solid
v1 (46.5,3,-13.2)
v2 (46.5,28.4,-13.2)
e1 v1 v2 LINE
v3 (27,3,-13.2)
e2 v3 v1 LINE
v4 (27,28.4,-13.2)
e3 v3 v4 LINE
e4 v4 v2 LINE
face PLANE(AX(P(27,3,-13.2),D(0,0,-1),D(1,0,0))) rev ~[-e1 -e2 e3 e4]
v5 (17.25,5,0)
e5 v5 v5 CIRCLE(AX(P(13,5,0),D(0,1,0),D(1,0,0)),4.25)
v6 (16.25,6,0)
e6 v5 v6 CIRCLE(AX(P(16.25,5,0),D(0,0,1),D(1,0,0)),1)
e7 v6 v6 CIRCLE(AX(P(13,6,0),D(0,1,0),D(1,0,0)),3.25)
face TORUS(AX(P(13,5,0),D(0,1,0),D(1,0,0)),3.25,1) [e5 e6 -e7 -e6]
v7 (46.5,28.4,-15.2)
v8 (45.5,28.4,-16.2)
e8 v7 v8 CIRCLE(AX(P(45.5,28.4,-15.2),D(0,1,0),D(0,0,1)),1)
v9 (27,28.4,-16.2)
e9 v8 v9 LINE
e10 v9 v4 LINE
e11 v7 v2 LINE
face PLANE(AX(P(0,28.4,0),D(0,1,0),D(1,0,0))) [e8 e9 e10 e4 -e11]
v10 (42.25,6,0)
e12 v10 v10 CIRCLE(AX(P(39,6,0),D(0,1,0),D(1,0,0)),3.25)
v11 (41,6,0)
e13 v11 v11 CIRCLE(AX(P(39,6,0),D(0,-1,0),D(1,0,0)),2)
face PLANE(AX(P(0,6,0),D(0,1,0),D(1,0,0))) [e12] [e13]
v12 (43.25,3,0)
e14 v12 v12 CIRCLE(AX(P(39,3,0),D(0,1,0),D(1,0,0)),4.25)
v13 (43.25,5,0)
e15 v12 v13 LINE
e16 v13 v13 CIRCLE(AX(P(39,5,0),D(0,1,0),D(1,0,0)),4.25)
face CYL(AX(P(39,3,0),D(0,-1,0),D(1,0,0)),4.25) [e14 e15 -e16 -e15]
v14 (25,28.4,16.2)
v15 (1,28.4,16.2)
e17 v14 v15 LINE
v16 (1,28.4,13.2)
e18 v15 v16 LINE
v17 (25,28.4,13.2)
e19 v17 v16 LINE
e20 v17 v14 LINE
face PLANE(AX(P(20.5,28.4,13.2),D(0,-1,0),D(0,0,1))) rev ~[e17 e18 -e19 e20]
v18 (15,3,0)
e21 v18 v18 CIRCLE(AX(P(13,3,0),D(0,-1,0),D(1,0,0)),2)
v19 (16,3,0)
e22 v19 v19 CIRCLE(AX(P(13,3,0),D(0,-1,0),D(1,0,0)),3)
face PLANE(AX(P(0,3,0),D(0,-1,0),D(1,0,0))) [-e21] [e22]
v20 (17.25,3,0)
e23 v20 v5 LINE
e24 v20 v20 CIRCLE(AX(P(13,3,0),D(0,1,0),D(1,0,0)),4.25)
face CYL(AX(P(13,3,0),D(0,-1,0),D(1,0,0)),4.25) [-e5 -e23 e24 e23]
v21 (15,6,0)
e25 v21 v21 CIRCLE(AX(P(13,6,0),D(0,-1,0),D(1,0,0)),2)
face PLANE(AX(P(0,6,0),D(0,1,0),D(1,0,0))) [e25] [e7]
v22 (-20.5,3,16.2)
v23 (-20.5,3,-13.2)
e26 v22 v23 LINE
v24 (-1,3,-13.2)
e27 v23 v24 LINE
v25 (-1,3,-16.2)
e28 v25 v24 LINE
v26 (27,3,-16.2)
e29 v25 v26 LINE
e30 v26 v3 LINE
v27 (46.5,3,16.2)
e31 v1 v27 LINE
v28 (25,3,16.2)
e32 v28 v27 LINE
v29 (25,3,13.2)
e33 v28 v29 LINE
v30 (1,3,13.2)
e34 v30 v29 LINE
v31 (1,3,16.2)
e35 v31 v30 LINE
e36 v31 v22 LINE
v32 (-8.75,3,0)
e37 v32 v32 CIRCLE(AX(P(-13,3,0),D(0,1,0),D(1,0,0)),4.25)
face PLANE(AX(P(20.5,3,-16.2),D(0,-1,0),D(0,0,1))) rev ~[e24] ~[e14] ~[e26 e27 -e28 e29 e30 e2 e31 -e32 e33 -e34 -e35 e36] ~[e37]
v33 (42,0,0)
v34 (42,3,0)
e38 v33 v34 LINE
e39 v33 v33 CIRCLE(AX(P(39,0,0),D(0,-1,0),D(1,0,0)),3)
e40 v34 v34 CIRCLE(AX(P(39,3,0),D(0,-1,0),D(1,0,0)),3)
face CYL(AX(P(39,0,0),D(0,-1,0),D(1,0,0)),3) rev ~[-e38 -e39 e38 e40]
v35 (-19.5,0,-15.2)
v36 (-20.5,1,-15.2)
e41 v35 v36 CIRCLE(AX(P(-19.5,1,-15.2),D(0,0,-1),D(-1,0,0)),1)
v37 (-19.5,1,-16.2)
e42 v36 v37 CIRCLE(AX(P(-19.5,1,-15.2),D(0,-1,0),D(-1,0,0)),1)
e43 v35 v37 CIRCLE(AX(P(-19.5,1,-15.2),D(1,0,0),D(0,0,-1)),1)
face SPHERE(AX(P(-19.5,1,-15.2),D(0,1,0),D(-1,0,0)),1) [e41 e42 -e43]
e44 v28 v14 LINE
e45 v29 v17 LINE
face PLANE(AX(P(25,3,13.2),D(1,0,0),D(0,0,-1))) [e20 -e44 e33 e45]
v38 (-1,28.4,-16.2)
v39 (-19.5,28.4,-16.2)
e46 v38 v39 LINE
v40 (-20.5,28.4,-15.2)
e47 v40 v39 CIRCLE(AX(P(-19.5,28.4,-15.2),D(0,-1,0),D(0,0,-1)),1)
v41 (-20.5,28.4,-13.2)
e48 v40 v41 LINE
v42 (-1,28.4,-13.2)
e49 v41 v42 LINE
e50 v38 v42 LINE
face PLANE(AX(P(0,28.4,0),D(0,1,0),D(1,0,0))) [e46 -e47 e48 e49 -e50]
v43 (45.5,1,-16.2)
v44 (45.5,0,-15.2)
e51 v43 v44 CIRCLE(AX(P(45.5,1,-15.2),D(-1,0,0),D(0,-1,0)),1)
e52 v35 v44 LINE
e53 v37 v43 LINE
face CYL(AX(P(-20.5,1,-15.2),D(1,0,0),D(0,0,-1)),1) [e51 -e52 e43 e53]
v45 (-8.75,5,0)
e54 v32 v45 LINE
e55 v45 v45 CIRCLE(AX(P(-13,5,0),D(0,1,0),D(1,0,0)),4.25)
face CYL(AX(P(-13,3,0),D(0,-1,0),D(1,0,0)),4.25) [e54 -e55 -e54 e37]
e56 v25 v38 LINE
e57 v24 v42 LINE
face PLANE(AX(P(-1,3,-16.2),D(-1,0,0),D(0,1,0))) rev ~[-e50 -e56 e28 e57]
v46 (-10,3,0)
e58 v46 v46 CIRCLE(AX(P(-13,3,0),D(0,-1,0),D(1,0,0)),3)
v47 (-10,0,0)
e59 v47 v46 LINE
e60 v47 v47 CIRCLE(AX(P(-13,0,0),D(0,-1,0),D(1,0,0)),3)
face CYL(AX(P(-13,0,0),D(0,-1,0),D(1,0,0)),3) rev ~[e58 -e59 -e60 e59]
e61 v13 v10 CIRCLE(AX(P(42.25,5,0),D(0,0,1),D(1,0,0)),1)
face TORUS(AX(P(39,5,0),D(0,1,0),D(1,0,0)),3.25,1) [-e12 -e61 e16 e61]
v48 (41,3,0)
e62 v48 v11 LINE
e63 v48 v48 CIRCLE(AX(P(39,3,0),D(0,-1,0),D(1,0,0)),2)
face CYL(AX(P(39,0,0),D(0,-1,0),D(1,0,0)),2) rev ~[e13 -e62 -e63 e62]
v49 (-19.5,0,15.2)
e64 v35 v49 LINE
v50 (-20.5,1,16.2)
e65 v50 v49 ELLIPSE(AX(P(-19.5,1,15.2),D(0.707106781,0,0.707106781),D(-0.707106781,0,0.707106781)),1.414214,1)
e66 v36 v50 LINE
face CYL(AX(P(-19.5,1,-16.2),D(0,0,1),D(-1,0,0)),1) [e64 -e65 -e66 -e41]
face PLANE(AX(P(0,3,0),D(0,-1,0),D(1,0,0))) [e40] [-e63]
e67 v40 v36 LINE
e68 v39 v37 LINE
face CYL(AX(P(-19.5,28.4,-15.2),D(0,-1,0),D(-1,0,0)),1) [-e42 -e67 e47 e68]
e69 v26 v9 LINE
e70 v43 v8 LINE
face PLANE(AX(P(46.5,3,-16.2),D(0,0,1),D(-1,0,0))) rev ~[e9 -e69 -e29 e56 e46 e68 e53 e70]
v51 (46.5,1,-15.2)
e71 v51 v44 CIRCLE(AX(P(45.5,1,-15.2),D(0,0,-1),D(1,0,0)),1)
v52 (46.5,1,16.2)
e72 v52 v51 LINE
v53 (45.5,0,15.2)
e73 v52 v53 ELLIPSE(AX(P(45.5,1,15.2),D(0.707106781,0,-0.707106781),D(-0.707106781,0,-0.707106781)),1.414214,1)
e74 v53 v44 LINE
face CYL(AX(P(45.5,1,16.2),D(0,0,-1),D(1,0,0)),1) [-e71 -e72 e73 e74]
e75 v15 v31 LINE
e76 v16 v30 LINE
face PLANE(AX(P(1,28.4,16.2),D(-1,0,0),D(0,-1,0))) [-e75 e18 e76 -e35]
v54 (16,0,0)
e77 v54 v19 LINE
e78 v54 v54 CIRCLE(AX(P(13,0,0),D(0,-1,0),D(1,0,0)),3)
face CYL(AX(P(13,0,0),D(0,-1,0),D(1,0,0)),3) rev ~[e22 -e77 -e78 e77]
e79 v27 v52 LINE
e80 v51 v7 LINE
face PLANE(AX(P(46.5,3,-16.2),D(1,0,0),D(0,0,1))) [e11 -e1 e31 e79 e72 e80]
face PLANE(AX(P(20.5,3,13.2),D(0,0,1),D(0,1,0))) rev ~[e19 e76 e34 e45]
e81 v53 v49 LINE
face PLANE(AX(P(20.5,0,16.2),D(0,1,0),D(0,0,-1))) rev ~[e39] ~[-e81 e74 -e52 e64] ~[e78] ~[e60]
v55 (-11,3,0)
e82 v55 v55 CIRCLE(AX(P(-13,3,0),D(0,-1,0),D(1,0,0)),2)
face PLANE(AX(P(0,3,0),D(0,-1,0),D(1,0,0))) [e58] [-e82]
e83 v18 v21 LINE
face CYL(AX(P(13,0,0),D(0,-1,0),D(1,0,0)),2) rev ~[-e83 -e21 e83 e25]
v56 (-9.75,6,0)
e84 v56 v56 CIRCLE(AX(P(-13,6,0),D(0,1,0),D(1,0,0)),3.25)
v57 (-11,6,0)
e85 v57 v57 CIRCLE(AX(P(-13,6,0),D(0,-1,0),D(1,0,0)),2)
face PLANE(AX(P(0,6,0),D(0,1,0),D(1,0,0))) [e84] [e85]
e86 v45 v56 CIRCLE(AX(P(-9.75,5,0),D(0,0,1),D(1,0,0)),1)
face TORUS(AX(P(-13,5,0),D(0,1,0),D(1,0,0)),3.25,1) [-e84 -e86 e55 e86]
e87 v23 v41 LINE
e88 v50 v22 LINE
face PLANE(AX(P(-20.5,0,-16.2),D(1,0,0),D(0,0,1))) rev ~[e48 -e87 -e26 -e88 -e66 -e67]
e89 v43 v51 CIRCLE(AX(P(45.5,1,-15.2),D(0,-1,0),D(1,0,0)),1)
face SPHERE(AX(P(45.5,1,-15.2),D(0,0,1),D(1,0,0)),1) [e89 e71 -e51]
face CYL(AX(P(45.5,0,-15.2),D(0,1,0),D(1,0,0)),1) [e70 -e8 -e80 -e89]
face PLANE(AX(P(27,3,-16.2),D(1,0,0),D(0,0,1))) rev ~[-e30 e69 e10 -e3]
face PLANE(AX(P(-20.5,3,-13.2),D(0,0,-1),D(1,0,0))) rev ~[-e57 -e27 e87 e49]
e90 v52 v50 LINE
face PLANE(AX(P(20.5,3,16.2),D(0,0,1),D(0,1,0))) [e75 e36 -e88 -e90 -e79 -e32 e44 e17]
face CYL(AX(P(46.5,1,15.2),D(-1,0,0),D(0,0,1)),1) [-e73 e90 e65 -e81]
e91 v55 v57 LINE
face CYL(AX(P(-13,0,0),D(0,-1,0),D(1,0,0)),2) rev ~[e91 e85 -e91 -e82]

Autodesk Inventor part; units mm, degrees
ref_plane "YZ Plane" through (0, 0, 0) normal (1, 0, 0) x (0, 1, 0)
ref_plane "XZ Plane" through (0, 0, 0) normal (0, 1, 0) x (-1, 0, 0)
ref_plane "XY Plane" through (0, 0, 0) normal (0, 0, 1) x (1, 0, 0)
sketch "Sketch1" plane through (0, 0, 0) normal (0, 1, 0) x (-1, 0, 0)
  line L0 (20.5, 16.2) -> (-20.5, 16.2)
  line L1 (-20.5, 16.2) -> (-20.5, -16.2)
  line L2 (-20.5, -16.2) -> (20.5, -16.2)
  line L3 (20.5, -16.2) -> (20.5, 16.2)
  point P0 (0, 0)
  dimension "d0" = 41
  dimension "d1" = 32.4
extrude "Extrusion1" add sketch "Sketch1" along normal blind 3
sketch "Sketch3" plane through (0, 3, 0) normal (0, 1, 0) x (1, 0, 0)
  line L0 (-20.5, -16.2) -> (20.5, -16.2) projected
  line L1 (-20.5, 16.2) -> (-20.5, -16.2) projected
  line L2 (20.5, -16.2) -> (-20.5, -16.2)
  line L3 (-20.5, -16.2) -> (-20.5, -13.2)
  line L4 (-20.5, -13.2) -> (20.5, -13.2)
  line L5 (20.5, -13.2) -> (20.5, -16.2)
  line L6 (20.5, 16.2) -> (-20.5, 16.2) projected
  line L7 (20.5, 16.2) -> (-20.5, 16.2)
  line L8 (-20.5, 16.2) -> (-20.5, 13.2)
  line L9 (-20.5, 13.2) -> (20.5, 13.2)
  line L10 (20.5, 13.2) -> (20.5, 16.2)
  point P0 (0, 0)
  dimension "d8" = 3
  dimension "d9" = 3
extrude "Extrusion3" add sketch "Sketch3" along normal blind 25.4
sketch "Sketch4" plane through (20.5, 0, -16.2) normal (0, 0, -1) x (-1, 0, 0)
  line L0 (41, 3) -> (0, 3) projected
  line L1 (0, 28.4) -> (41, 28.4) projected
  line L2 (0, 3) -> (21.5, 3)
  line L3 (21.5, 3) -> (21.5, 28.4)
  line L4 (21.5, 28.4) -> (0, 28.4)
  line L5 (0, 28.4) -> (0, 3)
  point P0 (20.5, 0)
  dimension "d12" = 21.5
extrude "Extrusion4" cut sketch "Sketch4" against normal blind 3
sketch "Sketch5" plane through (-20.5, 0, 16.2) normal (0, 0, 1) x (1, 0, 0)
  line L0 (41, 28.4) -> (0, 28.4) projected
  line L1 (19.5, 3) -> (41, 3) projected
  line L2 (0, 28.4) -> (21.5, 28.4)
  line L3 (21.5, 28.4) -> (21.5, 3)
  line L4 (21.5, 3) -> (0, 3)
  line L5 (0, 3) -> (0, 28.4)
  point P0 (20.5, 0)
  dimension "d15" = 21.5
extrude "Extrusion5" cut sketch "Sketch5" against normal blind 3
sketch "Sketch6" plane through (0, 3, 0) normal (0, 1, 0) x (1, 0, 0)
  circle A0 centre (13, 0) radius 4.25
  circle A1 centre (-13, 0) radius 4.25
  line L0 (-20.5, 13.2) -> (-20.5, -16.2) projected
  line L1 (20.5, -13.2) -> (20.5, 16.2) projected
  point P0 (0, 0)
  dimension "d20" = 8.5
  dimension "d21" = 8.5
  dimension "d32" = 26
  dimension "d33" = 7.5
  dimension "d34" = 7.5
extrude "Extrusion6" add sketch "Sketch6" along normal blind 3
sketch "Sketch9" plane through (20.5, 0, 16.2) normal (1, 0, 0) x (0, 0, -1)
  line L0 (32.4, 0) -> (32.4, 3) projected
  line L1 (32.4, 3) -> (0, 3)
  line L2 (0, 3) -> (0, 0)
  line L3 (0, 0) -> (32.4, 0)
  line L4 (32.4, 0) -> (32.4, 3)
  point P0 (16.2, 0)
extrude "Extrusion9" add sketch "Sketch9" along normal blind 26
sketch "Sketch10" plane through (0, 3, 0) normal (0, 1, 0) x (1, 0, 0)
  circle A0 centre (39, 0) radius 4.25
  point P0 (0, 0)
  dimension "d37" = 8.5
extrude "Extrusion10" add sketch "Sketch10" along normal blind 3
sketch "Sketch11" plane through (0, 3, 0) normal (0, 1, 0) x (1, 0, 0)
  line L0 (46.5, 16.2) -> (46.5, -16.2) projected
  line L1 (46.5, 16.2) -> (27, 16.2)
  line L2 (27, 16.2) -> (27, 13.2)
  line L3 (27, 13.2) -> (46.5, 13.2)
  line L4 (46.5, 13.2) -> (46.5, 16.2)
  point P0 (0, 0)
  dimension "d40" = 19.5
  dimension "d41" = 3
extrude "Extrusion11" add sketch "Sketch11" along normal blind 25.4
sketch "Sketch14" plane through (20.5, 3, 13.2) normal (1, 0, 0) x (0, 0, -1)
  line L0 (0, 0) -> (0, 25.4) projected
  line L1 (-3, 0) -> (-3, 25.4) projected
  line L2 (0, 25.4) -> (-3, 25.4)
  line L3 (-3, 25.4) -> (-3, 0)
  line L4 (-3, 0) -> (0, 0)
  line L5 (0, 0) -> (0, 25.4)
  point P0 (13.2, -3)
extrude "Extrusion14" add sketch "Sketch14" along normal blind 4.5
fillet "Fillet1" radius 1 3 edges at (-17.25, 6, 0) (8.75, 6, 0) (34.75, 6, 0)
fillet "Fillet2" radius 1 6 edges at (-20.5, 14.2, -16.2) (-20.5, 0, 0) (13, 0, 16.2) (46.5, 0, 0) (46.5, 14.2, -16.2) (13, 0, -16.2)
sketch "Sketch15" plane through (0, 0, 0) normal (0, -1, 0) x (1, 0, 0)
  circle A0 centre (39, 0) radius 4.25 projected
  circle A1 centre (39, 0) radius 2
  circle A2 centre (13, 0) radius 3.25 projected
  circle A3 centre (13, 0) radius 2
  circle A4 centre (-13, 0) radius 3.25 projected
  circle A5 centre (-13, 0) radius 2
  point P0 (0, 0)
  dimension "d54" = 4
  dimension "d55" = 4
  dimension "d56" = 4
extrude "Extrusion15" cut sketch "Sketch15" against normal blind 10 contours A1 | A3 | A5
sketch "Sketch16" plane through (0, 0, 0) normal (0, -1, 0) x (1, 0, 0)
  circle A0 centre (39, 0) radius 2 projected
  circle A1 centre (39, 0) radius 3
  circle A2 centre (13, 0) radius 2 projected
  circle A3 centre (13, 0) radius 3
  circle A4 centre (-13, 0) radius 2 projected
  circle A5 centre (-13, 0) radius 3
  point P0 (0, 0)
  dimension "d59" = 6
  dimension "d60" = 6
  dimension "d61" = 6
extrude "Extrusion16" cut sketch "Sketch16" against normal blind 3 contours A0 | A1 | A2 | A3 | A4 | A5
properties part number "zMount1-2.2"
